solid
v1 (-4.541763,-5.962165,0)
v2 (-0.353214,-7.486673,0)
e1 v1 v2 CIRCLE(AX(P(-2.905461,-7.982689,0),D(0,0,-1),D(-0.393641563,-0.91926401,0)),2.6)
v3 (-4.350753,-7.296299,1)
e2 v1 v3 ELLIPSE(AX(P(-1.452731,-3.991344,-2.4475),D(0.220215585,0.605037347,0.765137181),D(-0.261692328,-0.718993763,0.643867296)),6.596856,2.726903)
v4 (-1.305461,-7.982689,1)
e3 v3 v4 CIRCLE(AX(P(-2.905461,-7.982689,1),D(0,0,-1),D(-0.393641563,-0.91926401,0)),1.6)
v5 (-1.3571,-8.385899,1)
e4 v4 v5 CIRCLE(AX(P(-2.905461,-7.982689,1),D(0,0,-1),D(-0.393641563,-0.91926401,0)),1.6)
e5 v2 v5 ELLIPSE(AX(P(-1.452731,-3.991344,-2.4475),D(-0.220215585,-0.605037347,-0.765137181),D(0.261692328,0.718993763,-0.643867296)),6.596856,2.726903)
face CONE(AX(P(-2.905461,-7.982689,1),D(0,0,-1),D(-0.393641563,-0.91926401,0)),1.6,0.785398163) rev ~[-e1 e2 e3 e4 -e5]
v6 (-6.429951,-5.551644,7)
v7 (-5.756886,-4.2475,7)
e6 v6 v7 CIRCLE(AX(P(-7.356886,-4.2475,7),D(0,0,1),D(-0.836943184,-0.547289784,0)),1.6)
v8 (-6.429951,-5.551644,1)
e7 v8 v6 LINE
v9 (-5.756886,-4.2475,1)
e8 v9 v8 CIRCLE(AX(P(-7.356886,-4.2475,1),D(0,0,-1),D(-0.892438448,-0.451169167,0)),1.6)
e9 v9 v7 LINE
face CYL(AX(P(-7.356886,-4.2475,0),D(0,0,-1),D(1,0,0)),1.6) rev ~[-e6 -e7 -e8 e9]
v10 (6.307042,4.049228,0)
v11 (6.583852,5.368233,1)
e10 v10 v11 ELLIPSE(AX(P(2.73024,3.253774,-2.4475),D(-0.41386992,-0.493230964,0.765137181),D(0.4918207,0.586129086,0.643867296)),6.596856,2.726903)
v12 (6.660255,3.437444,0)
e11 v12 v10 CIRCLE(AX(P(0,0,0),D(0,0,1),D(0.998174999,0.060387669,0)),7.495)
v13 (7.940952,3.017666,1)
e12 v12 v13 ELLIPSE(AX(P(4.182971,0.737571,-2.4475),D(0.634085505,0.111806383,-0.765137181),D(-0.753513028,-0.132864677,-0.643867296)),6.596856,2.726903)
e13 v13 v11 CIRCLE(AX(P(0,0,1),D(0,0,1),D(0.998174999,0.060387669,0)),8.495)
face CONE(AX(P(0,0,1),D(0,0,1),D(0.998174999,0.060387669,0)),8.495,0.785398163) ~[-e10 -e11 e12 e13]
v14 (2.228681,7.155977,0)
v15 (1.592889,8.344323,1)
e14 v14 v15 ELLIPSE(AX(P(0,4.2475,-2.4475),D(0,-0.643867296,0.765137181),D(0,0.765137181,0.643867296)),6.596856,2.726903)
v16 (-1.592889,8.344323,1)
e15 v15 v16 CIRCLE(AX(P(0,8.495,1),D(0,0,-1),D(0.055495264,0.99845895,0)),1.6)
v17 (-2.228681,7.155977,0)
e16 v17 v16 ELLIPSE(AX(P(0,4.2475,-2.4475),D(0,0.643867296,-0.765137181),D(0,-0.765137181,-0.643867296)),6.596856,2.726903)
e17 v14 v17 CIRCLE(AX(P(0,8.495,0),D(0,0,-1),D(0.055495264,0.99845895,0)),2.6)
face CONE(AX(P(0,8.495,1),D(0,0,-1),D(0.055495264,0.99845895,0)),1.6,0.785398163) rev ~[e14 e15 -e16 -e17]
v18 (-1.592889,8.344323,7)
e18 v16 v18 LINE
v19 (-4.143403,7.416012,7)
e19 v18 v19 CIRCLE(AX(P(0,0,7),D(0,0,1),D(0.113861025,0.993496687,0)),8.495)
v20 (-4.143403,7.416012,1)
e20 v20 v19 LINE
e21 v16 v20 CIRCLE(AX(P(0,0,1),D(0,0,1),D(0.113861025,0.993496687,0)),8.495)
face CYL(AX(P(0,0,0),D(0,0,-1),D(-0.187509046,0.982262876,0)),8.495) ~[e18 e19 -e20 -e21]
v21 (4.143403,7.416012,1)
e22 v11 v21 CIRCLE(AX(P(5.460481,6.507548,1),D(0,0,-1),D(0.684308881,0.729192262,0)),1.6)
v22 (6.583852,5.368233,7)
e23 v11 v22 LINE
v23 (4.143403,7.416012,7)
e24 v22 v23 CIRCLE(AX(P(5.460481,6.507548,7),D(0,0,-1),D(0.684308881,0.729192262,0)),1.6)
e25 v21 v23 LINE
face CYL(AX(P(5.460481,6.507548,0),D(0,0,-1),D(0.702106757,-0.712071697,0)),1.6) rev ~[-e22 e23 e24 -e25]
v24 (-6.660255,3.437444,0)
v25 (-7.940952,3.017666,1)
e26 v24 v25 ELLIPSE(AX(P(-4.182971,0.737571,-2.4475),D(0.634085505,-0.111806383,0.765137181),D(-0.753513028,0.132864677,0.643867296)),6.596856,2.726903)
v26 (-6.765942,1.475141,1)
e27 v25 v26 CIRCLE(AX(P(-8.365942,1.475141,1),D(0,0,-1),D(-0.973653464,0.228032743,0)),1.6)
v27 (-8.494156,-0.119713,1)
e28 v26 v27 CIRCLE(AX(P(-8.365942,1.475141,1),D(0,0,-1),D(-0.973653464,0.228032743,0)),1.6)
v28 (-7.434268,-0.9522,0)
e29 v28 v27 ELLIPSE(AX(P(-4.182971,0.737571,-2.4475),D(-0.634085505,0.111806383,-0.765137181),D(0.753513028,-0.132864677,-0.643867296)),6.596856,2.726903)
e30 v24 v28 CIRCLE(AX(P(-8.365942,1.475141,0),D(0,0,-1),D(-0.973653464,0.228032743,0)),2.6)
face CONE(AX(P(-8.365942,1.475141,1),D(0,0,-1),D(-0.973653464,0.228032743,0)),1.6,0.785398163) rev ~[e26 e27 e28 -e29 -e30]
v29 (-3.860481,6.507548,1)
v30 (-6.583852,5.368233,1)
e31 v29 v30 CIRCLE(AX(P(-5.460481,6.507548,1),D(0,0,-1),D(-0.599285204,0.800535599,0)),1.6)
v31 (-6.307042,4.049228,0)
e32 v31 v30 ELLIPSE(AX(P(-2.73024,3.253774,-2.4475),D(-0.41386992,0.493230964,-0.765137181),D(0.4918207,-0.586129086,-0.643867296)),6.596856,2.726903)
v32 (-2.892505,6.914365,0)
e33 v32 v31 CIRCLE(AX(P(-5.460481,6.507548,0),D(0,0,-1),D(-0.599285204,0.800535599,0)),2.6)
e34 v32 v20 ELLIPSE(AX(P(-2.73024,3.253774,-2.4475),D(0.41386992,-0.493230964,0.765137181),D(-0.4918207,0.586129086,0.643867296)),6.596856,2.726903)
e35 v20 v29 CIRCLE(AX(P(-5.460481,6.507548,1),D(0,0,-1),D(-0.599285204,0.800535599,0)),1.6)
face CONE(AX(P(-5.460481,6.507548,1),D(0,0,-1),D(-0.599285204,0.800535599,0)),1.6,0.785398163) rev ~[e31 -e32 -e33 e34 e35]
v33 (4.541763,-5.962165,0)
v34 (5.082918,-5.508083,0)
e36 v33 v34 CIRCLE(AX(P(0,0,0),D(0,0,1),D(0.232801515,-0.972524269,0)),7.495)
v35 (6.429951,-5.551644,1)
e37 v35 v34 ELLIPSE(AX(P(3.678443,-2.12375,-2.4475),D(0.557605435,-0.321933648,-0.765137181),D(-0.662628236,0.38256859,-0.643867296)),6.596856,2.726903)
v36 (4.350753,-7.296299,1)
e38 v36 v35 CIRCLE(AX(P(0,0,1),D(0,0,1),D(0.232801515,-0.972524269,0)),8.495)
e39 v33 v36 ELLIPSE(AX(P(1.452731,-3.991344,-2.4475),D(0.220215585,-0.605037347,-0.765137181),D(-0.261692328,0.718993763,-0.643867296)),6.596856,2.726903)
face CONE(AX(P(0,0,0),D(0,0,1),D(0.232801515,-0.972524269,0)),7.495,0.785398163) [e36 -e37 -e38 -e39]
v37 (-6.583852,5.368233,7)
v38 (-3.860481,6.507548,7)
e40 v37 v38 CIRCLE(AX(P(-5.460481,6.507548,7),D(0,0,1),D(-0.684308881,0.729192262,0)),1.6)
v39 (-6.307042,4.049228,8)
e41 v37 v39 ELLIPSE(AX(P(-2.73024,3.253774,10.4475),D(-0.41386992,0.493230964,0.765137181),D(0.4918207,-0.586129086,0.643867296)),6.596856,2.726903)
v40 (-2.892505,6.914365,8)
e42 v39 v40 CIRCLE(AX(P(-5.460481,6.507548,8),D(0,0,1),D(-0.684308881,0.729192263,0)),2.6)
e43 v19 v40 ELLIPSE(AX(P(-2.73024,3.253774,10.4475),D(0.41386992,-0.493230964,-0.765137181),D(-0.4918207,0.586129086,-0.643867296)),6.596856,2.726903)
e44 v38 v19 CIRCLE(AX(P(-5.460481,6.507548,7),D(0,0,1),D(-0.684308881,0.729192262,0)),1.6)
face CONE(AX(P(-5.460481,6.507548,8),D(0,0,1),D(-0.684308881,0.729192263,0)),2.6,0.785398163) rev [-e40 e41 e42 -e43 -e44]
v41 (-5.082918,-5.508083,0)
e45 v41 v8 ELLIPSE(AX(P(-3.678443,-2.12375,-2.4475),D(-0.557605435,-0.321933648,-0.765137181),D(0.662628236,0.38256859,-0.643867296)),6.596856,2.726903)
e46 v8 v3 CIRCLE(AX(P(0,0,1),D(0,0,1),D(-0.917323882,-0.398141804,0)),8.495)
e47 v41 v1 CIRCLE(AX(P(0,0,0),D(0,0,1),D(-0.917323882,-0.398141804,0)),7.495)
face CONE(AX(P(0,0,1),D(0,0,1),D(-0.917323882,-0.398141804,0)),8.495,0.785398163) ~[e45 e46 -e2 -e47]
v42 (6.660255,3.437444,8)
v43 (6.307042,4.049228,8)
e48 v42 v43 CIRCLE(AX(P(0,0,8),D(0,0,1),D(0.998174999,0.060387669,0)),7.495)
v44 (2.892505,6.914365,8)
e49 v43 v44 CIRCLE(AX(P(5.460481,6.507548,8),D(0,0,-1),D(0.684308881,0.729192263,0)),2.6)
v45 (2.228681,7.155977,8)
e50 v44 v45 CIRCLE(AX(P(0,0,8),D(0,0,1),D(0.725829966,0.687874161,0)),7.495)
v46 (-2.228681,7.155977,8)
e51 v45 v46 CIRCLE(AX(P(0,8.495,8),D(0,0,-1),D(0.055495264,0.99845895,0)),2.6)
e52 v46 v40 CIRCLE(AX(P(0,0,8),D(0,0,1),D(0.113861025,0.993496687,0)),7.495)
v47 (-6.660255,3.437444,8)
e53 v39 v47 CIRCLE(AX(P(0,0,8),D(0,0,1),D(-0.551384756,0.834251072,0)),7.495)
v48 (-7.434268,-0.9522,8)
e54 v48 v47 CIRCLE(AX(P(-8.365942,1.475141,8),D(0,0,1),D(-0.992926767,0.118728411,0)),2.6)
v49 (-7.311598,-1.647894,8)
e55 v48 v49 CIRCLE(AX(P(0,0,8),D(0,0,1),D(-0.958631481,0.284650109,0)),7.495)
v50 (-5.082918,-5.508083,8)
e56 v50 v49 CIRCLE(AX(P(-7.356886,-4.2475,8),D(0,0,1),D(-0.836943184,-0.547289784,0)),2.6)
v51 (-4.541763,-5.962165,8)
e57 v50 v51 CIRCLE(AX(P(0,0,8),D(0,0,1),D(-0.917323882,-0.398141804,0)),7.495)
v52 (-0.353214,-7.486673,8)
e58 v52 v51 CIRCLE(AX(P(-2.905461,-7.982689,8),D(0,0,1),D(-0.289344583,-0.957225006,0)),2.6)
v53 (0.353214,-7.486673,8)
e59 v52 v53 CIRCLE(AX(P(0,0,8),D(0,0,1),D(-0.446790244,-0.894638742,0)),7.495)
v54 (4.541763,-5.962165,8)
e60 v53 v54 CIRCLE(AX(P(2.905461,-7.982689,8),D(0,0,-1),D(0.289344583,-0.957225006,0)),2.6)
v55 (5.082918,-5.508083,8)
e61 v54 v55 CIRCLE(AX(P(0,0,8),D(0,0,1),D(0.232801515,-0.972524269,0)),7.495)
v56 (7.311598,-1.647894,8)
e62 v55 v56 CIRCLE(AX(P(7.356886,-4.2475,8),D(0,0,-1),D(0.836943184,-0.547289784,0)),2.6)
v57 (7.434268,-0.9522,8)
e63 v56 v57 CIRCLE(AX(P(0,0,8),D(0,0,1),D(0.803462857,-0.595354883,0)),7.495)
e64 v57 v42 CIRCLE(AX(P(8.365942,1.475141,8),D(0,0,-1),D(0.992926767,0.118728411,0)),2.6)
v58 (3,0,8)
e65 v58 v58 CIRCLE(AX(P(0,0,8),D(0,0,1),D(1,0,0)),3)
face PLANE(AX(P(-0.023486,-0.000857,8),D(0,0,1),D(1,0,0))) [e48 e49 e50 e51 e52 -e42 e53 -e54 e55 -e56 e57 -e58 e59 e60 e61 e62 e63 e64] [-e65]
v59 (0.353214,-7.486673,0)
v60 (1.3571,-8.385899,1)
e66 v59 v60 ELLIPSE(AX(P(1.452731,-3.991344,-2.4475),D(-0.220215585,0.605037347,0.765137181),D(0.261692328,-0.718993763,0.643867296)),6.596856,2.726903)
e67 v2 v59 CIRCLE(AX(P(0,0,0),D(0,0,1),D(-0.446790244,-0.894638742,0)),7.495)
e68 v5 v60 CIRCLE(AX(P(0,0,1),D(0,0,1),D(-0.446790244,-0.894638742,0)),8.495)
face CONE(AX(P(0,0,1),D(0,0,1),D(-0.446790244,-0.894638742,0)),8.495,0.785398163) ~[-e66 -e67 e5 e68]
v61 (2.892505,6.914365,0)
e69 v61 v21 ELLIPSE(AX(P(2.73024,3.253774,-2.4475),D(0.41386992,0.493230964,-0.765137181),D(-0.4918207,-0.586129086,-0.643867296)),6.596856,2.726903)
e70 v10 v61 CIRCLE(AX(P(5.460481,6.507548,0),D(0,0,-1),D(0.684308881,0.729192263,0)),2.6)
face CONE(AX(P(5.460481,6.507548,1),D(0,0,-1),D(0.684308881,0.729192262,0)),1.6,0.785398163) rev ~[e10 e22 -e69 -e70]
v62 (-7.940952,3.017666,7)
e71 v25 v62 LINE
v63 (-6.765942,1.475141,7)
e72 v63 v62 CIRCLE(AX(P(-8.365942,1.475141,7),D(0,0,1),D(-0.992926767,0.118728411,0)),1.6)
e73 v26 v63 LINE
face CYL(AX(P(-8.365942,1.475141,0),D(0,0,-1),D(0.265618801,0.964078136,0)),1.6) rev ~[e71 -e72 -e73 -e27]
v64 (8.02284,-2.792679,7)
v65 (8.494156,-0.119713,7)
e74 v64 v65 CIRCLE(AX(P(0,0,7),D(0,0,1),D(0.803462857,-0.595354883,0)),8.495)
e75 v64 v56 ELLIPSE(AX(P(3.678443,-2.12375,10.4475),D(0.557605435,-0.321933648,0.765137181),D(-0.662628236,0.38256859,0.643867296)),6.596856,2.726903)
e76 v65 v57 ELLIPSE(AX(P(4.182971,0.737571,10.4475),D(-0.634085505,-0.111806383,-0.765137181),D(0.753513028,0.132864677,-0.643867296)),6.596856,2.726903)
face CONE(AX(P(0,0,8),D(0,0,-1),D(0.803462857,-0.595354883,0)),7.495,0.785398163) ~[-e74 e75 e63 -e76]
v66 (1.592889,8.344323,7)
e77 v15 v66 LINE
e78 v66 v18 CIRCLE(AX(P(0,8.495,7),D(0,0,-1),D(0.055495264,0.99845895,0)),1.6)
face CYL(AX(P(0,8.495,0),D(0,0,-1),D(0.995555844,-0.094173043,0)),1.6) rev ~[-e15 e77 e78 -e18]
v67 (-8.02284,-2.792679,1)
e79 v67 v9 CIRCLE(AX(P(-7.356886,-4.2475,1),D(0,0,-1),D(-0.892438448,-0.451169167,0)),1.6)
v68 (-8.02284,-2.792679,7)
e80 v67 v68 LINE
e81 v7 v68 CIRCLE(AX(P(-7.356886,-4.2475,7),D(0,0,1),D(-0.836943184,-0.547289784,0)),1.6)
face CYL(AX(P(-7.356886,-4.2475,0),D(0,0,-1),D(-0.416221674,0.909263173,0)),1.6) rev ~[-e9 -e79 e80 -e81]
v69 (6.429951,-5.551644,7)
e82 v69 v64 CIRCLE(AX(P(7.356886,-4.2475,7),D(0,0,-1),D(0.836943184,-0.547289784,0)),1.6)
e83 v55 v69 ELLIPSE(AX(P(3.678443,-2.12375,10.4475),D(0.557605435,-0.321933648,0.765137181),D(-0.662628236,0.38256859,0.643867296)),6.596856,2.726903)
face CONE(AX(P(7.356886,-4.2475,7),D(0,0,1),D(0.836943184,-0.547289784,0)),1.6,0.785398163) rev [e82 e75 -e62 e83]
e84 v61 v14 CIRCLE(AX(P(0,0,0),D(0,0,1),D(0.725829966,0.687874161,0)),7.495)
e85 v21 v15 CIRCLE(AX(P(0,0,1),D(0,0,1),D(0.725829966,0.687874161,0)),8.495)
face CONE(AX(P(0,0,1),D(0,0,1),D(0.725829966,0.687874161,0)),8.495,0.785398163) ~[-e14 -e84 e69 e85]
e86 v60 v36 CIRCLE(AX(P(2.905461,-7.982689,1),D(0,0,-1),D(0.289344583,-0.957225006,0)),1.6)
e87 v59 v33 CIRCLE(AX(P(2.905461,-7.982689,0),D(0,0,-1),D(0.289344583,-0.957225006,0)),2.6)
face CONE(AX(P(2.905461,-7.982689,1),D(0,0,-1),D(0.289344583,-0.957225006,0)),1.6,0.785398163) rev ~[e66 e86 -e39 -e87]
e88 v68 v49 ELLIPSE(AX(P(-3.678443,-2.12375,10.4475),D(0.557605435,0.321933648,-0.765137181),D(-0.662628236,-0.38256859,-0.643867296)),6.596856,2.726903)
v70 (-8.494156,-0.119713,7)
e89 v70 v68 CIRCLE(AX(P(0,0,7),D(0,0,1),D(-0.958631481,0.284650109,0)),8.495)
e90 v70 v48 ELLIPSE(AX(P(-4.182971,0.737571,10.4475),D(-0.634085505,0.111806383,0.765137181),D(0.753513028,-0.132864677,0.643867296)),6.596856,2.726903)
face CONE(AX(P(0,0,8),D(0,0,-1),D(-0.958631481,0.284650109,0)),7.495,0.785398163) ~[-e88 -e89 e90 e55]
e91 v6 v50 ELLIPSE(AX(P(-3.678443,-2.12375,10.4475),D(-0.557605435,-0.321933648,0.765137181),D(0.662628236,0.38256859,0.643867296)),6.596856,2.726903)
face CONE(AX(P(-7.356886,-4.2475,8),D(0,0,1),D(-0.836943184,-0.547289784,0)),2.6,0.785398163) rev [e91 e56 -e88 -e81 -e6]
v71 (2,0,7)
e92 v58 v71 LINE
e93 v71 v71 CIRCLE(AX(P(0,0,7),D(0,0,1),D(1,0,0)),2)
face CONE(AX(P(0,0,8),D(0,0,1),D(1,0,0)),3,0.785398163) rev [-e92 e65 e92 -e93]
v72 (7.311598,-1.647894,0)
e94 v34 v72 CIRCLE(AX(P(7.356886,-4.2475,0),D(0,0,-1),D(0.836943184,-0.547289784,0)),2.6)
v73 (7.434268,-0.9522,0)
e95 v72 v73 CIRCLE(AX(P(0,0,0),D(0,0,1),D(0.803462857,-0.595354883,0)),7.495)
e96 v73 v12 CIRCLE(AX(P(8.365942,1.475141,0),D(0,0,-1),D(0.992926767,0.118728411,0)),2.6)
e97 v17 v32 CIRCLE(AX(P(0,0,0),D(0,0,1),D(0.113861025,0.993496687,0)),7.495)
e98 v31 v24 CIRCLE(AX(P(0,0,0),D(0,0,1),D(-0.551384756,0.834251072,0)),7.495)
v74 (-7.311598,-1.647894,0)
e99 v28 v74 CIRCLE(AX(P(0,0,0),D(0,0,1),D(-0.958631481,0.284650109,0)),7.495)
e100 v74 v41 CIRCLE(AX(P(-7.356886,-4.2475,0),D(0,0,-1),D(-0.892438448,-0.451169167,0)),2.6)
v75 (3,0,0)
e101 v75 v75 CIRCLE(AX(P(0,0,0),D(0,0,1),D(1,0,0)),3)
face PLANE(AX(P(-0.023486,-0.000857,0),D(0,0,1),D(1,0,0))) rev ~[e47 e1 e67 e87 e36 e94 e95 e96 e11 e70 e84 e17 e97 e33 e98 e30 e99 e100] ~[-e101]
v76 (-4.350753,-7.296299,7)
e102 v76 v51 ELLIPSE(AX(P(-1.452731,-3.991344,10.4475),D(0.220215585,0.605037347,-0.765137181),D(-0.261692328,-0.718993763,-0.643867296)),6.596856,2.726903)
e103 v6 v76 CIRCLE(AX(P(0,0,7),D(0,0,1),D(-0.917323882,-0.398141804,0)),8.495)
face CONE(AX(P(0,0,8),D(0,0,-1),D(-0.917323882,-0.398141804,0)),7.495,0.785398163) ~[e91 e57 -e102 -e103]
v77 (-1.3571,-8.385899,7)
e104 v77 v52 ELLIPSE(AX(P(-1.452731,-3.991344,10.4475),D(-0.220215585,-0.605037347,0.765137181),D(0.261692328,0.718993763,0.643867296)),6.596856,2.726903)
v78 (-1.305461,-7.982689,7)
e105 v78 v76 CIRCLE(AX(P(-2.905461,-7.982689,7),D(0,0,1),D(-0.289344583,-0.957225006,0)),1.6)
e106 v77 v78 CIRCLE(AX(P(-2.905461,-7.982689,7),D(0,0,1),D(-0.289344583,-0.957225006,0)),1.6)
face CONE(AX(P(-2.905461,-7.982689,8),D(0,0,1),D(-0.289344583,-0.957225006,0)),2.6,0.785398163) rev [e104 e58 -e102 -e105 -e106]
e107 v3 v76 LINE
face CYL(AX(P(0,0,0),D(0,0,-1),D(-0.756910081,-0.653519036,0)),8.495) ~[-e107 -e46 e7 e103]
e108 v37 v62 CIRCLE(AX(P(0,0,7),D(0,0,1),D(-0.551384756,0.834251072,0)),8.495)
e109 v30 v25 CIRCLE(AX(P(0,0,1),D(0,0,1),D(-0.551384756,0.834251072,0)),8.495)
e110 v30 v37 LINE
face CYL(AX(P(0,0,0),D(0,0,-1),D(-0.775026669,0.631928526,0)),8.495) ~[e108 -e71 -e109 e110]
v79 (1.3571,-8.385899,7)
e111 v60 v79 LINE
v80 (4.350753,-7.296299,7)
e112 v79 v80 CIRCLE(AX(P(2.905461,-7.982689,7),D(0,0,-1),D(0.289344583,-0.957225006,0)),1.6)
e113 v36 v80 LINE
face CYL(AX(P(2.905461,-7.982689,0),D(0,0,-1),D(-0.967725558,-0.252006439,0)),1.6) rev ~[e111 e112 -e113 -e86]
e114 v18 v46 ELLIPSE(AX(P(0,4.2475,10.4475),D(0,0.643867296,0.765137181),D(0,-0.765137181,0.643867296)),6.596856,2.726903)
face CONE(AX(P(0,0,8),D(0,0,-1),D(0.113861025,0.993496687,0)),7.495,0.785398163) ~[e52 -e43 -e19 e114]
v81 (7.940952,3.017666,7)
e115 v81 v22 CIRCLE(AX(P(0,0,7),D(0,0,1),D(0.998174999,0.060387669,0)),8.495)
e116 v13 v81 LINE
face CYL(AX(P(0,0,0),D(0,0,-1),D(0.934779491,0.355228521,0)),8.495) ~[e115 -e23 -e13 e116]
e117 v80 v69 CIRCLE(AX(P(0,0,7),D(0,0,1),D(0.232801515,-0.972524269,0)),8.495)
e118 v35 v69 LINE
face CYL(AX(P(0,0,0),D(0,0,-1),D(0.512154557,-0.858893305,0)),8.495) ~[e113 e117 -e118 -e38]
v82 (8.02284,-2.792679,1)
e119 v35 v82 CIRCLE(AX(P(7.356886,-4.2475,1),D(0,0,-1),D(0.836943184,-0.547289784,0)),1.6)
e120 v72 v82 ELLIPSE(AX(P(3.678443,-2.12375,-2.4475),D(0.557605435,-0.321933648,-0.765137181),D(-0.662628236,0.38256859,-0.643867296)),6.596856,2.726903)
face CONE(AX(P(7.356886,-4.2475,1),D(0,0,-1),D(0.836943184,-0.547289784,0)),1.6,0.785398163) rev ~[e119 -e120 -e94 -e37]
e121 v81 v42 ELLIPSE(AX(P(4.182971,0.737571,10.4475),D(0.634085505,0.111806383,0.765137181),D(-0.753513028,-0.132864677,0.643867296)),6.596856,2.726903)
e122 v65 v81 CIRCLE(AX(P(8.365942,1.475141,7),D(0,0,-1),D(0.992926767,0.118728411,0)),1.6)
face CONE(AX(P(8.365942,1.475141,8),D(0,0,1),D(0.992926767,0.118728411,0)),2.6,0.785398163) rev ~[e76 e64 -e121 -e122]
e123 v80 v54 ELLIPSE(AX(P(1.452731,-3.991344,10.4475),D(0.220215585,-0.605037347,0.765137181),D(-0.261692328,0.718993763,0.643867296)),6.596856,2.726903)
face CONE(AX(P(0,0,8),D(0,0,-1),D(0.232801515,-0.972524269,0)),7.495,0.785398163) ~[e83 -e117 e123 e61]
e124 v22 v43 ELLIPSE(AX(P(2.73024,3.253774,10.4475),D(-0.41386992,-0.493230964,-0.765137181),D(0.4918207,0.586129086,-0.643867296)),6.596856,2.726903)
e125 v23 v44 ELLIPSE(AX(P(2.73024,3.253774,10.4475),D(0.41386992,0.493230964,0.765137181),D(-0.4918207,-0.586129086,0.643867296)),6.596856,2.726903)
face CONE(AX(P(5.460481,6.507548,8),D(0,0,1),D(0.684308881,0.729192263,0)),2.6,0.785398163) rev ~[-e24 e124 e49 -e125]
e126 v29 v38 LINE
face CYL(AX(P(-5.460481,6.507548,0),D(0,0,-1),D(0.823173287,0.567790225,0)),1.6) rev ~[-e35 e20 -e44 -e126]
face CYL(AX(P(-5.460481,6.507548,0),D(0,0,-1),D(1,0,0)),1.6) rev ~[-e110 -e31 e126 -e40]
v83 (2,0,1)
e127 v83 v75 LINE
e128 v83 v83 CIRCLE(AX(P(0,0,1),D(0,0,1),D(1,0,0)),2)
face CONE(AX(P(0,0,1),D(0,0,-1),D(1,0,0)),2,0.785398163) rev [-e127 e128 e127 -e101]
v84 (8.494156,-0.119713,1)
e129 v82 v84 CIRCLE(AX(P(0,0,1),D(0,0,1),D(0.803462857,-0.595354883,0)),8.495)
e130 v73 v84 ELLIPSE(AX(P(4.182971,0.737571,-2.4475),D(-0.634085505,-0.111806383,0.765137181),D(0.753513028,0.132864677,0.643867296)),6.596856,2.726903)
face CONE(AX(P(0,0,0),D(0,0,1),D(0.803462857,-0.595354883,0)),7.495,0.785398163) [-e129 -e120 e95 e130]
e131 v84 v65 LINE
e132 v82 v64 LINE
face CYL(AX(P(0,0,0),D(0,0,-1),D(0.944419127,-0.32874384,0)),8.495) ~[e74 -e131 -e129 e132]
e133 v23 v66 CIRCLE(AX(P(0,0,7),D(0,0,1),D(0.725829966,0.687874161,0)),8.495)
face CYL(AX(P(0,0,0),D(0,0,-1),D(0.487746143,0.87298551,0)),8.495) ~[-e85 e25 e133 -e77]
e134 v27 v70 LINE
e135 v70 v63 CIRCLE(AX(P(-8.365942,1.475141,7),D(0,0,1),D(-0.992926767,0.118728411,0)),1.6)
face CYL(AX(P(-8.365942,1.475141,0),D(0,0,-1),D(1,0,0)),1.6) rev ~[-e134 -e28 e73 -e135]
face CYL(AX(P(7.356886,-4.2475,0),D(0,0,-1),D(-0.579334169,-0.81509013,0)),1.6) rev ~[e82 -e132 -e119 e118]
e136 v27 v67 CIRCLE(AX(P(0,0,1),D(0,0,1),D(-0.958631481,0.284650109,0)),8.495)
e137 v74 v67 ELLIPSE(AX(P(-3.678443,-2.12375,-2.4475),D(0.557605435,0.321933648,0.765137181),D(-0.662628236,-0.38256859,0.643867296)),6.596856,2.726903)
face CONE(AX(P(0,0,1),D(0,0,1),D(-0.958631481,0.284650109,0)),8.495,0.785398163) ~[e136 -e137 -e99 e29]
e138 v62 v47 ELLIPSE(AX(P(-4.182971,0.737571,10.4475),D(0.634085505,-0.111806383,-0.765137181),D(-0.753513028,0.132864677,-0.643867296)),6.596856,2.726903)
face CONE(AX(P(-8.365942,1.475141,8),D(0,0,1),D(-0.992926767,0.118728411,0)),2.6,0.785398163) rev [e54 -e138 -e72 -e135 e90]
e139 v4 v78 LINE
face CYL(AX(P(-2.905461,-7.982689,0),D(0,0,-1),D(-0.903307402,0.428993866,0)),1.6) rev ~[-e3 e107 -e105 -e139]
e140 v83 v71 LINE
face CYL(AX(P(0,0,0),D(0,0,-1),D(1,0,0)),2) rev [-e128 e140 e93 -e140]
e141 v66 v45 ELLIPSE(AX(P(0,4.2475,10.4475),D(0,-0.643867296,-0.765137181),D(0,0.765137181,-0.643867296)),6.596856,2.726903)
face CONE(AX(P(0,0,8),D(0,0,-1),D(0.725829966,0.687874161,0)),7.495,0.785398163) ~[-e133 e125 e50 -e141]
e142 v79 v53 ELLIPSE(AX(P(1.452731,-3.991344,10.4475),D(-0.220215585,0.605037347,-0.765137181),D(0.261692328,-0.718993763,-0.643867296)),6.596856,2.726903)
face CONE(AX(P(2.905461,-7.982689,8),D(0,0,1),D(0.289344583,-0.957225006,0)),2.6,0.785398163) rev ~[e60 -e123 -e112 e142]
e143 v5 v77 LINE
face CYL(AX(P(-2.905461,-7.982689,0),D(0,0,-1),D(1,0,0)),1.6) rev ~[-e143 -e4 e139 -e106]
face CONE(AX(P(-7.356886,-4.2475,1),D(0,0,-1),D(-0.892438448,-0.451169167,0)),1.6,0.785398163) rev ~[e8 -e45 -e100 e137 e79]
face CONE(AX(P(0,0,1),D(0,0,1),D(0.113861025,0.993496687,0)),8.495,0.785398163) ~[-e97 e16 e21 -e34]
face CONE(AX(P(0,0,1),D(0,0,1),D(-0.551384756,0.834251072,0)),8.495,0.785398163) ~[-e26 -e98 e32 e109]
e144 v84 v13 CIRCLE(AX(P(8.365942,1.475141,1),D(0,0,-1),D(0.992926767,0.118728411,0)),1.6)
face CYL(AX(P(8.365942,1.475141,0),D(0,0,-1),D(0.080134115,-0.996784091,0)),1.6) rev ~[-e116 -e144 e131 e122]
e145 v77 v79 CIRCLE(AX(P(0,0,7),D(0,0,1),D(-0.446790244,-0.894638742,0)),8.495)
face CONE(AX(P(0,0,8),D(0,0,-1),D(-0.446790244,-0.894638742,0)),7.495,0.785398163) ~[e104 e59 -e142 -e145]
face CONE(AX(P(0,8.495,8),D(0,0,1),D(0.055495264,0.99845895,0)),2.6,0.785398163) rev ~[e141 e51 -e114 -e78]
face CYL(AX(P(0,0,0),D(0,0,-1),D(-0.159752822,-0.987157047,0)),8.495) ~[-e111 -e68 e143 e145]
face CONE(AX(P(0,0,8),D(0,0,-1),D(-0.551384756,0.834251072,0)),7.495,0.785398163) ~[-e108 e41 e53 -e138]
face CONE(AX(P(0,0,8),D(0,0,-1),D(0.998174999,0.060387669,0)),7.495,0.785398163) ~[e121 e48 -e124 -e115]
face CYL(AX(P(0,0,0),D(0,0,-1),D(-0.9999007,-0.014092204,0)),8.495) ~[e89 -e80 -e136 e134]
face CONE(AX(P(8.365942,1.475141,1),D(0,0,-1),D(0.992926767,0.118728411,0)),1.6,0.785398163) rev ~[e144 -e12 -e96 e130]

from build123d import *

# Parameters (mm, degrees)
F0_R         = 2
F1_DEPTH     = 8
F2_T2_ANGLE  = 353.6374425132
F2_T4_ANGLE  = 53.075870109
F2_T6_ANGLE  = 353.6374425132
F2_T8_ANGLE  = 53.075870109
F2_T10_ANGLE = 353.6374425132
F2_T12_ANGLE = 53.075870109
F2_T14_ANGLE = 353.6374425132
F2_T16_ANGLE = 53.075870109
F2_T18_ANGLE = 353.6374425132
F2_T20_ANGLE = 53.075870109
F2_T22_ANGLE = 353.6374425132
F2_T24_ANGLE = 53.075870109
F2_T26_ANGLE = 353.6374425132
F2_T28_ANGLE = 53.075870109
F2_T30_ANGLE = 353.6374425132
F2_T32_ANGLE = 53.075870109
F2_T34_ANGLE = 353.6374425132
F2_T36_ANGLE = 53.075870109
F2_T40_ANGLE = 353.6374425132
F2_T42_ANGLE = 53.075870109
F2_T44_ANGLE = 353.6374425132
F2_T46_ANGLE = 53.075870109
F2_T48_ANGLE = 353.6374425132
F2_T50_ANGLE = 53.075870109
F2_T52_ANGLE = 353.6374425132
F2_T54_ANGLE = 53.075870109
F2_T56_ANGLE = 353.6374425132
F2_T58_ANGLE = 53.075870109
F2_T60_ANGLE = 353.6374425132
F2_T62_ANGLE = 53.075870109
F2_T64_ANGLE = 353.6374425132
F2_T66_ANGLE = 53.075870109
F2_T68_ANGLE = 353.6374425132
F2_T70_ANGLE = 53.075870109
F2_T72_ANGLE = 353.6374425132
F2_T74_ANGLE = 53.075870109


# Not quite as in the source:
# - a fillet or chamfer that OpenCascade refuses, or shapes differently, is made with other operations: its cross-section is extruded or revolved along the edge and cut away or added


with BuildPart() as f1:
    # F0 (on Top) → F1 (new body)
    with BuildSketch(Plane.XY):
        with BuildLine():
            ThreePointArc((8.4941564461, -0.1197132759), (6.790249457, 1.197304185), (7.9409517805, 3.0176662871))
            ThreePointArc((7.9409517805, 3.0176662871), (7.3568858051, 4.2475), (6.583851555, 5.3682328285))
            ThreePointArc((6.583851555, 5.3682328285), (4.4320205688, 5.2818764353), (4.1434034849, 7.416011904))
            ThreePointArc((4.1434034849, 7.416011904), (2.9054611176, 7.9826888136), (1.59288935, 8.3443231313))
            ThreePointArc((1.59288935, 8.3443231313), (0, 6.895), (-1.59288935, 8.3443231313))
            ThreePointArc((-1.59288935, 8.3443231313), (-2.9054611176, 7.9826888136), (-4.1434034849, 7.416011904))
            ThreePointArc((-4.1434034849, 7.416011904), (-3.932847998, 6.983297681), (-3.8604807443, 6.5075475443))
            ThreePointArc((-3.8604807443, 6.5075475443), (-4.8429830913, 5.0315066747), (-6.583851555, 5.3682328285))
            ThreePointArc((-6.583851555, 5.3682328285), (-7.3568858051, 4.2475), (-7.9409517805, 3.0176662871))
            ThreePointArc((-7.9409517805, 3.0176662871), (-7.0931527728, 2.4446813329), (-6.7659418618, 1.4751412693))
            ThreePointArc((-6.7659418618, 1.4751412693), (-7.2808481642, 0.2993131919), (-8.4941564461, -0.1197132759))
            ThreePointArc((-8.4941564461, -0.1197132759), (-8.3659418618, -1.4751412693), (-8.022840484, -2.7926789231))
            ThreePointArc((-8.022840484, -2.7926789231), (-6.4924575219, -2.90111085), (-5.7568858051, -4.2475))
            ThreePointArc((-5.7568858051, -4.2475), (-5.9350743771, -4.9812930656), (-6.4299511341, -5.5516442081))
            ThreePointArc((-6.4299511341, -5.5516442081), (-5.4604807443, -6.5075475443), (-4.3507529612, -7.2962986281))
            ThreePointArc((-4.3507529612, -7.2962986281), (-2.5536564486, -6.4218449793), (-1.3054611176, -7.9826888136))
            ThreePointArc((-1.3054611176, -7.9826888136), (-1.318423401, -8.1859405941), (-1.3571002254, -8.3858991157))
            ThreePointArc((-1.3571002254, -8.3858991157), (0, -8.495), (1.3571002254, -8.3858991157))
            ThreePointArc((1.3571002254, -8.3858991157), (2.3582288882, -6.4791806203), (4.3507529612, -7.2962986281))
            ThreePointArc((4.3507529612, -7.2962986281), (5.4604807443, -6.5075475443), (6.4299511341, -5.5516442081))
            ThreePointArc((6.4299511341, -5.5516442081), (5.9712451591, -3.4475), (8.022840484, -2.7926789231))
            ThreePointArc((8.022840484, -2.7926789231), (8.3659418618, -1.4751412693), (8.4941564461, -0.1197132759))
        make_face()
        Circle(F0_R, mode=Mode.SUBTRACT)
    extrude(amount=F1_DEPTH)

    # F2: chamfer of 1 on 38 edges, made by hand

    # F2_s1 → F2_t2 (revolve, cut)
    with BuildSketch(Plane(origin=(0.2580100634, 0.3945620225, 0), x_dir=(0, 0, 1), z_dir=(0.5472897836, 0.8369431837, 0))):
        Polygon((7, 10.0819087839), (8, 11.0819087839), (8, 10.0819087839), align=None)
    revolve(axis=Axis((7.3568858051, -4.2475, 8), (0, 0, -1)), revolution_arc=F2_T2_ANGLE, mode=Mode.SUBTRACT)

    # F2_s3 → F2_t4 (revolve, cut)
    with BuildSketch(Plane(origin=(0, 0, 0), x_dir=(0, 0, 1), z_dir=(-0.5953548832, -0.8034628573, 0))):
        Polygon((8, -7.495), (7, -8.495), (8, -8.495), align=None)
    revolve(axis=Axis((0, 0, 8), (0, 0, 1)), revolution_arc=F2_T4_ANGLE, mode=Mode.SUBTRACT)

    # F2_s5 → F2_t6 (revolve, cut)
    with BuildSketch(Plane(origin=(-0.055972404, 0.4680977167, 0), x_dir=(0, 0, 1), z_dir=(-0.118728411, 0.9929267669, 0))):
        Polygon((8, 11.0819087839), (7, 10.0819087839), (8, 10.0819087839), align=None)
    revolve(axis=Axis((8.3659418618, 1.4751412693, 8), (0, 0, -1)), revolution_arc=F2_T6_ANGLE, mode=Mode.SUBTRACT)

    # F2_s7 → F2_t8 (revolve, cut)
    with BuildSketch(Plane(origin=(0, 0, 0), x_dir=(0, 0, 1), z_dir=(0.0603876695, -0.9981749994, 0))):
        Polygon((8, -7.495), (7, -8.495), (8, -8.495), align=None)
    revolve(axis=Axis((0, 0, 8), (0, 0, 1)), revolution_arc=F2_T8_ANGLE, mode=Mode.SUBTRACT)

    # F2_s9 → F2_t10 (revolve, cut)
    with BuildSketch(Plane(origin=(-0.3437647615, 0.322605287, 0), x_dir=(0, 0, 1), z_dir=(-0.7291922626, 0.6843088807, 0))):
        Polygon((8, 11.0819087839), (7, 10.0819087839), (8, 10.0819087839), align=None)
    revolve(axis=Axis((5.4604807443, 6.5075475443, 8), (0, 0, -1)), revolution_arc=F2_T10_ANGLE, mode=Mode.SUBTRACT)

    # F2_s11 → F2_t12 (revolve, cut)
    with BuildSketch(Plane(origin=(0, 0, 0), x_dir=(0, 0, 1), z_dir=(0.6878741606, -0.7258299658, 0))):
        Polygon((8, -7.495), (7, -8.495), (8, -8.495), align=None)
    revolve(axis=Axis((0, 0, 8), (0, 0, 1)), revolution_arc=F2_T12_ANGLE, mode=Mode.SUBTRACT)

    # F2_s13 → F2_t14 (revolve, cut)
    with BuildSketch(Plane(origin=(-0.4707057666, 0.0261622581, 0), x_dir=(0, 0, 1), z_dir=(-0.9984589504, 0.0554952639, 0))):
        Polygon((8, 11.0819087839), (7, 10.0819087839), (8, 10.0819087839), align=None)
    revolve(axis=Axis((0, 8.495, 8), (0, 0, -1)), revolution_arc=F2_T14_ANGLE, mode=Mode.SUBTRACT)

    # F2_s15 → F2_t16 (revolve, cut)
    with BuildSketch(Plane(origin=(0, 0, 0), x_dir=(0, 0, 1), z_dir=(0.993496687, -0.1138610245, 0))):
        Polygon((8, -7.495), (7, -8.495), (8, -8.495), align=None)
    revolve(axis=Axis((0, 0, 8), (0, 0, 1)), revolution_arc=F2_T16_ANGLE, mode=Mode.SUBTRACT)

    # F2_s17 → F2_t18 (revolve, cut)
    with BuildSketch(Plane(origin=(0.3437647615, 0.322605287, 0), x_dir=(0, 0, 1), z_dir=(0.7291922626, 0.6843088807, 0))):
        Polygon((8, -11.0819087839), (7, -10.0819087839), (8, -10.0819087839), align=None)
    revolve(axis=Axis((-5.4604807443, 6.5075475443, 8), (0, 0, 1)), revolution_arc=F2_T18_ANGLE, mode=Mode.SUBTRACT)

    # F2_s19 → F2_t20 (revolve, cut)
    with BuildSketch(Plane(origin=(0, 0, 0), x_dir=(0, 0, 1), z_dir=(0.8342510721, 0.5513847556, 0))):
        Polygon((8, -7.495), (7, -8.495), (8, -8.495), align=None)
    revolve(axis=Axis((0, 0, 8), (0, 0, 1)), revolution_arc=F2_T20_ANGLE, mode=Mode.SUBTRACT)

    # F2_s21 → F2_t22 (revolve, cut)
    with BuildSketch(Plane(origin=(0.055972404, 0.4680977167, 0), x_dir=(0, 0, 1), z_dir=(0.118728411, 0.9929267669, 0))):
        Polygon((8, -11.0819087839), (7, -10.0819087839), (8, -10.0819087839), align=None)
    revolve(axis=Axis((-8.3659418618, 1.4751412693, 8), (0, 0, 1)), revolution_arc=F2_T22_ANGLE, mode=Mode.SUBTRACT)

    # F2_s23 → F2_t24 (revolve, cut)
    with BuildSketch(Plane(origin=(0, 0, 0), x_dir=(0, 0, 1), z_dir=(0.2846501089, 0.9586314806, 0))):
        Polygon((8, -7.495), (7, -8.495), (8, -8.495), align=None)
    revolve(axis=Axis((0, 0, 8), (0, 0, 1)), revolution_arc=F2_T24_ANGLE, mode=Mode.SUBTRACT)

    # F2_s25 → F2_t26 (revolve, cut)
    with BuildSketch(Plane(origin=(-0.2580100634, 0.3945620225, 0), x_dir=(0, 0, 1), z_dir=(-0.5472897836, 0.8369431837, 0))):
        Polygon((8, -11.0819087839), (7, -10.0819087839), (8, -10.0819087839), align=None)
    revolve(axis=Axis((-7.3568858051, -4.2475, 8), (0, 0, 1)), revolution_arc=F2_T26_ANGLE, mode=Mode.SUBTRACT)

    # F2_s27 → F2_t28 (revolve, cut)
    with BuildSketch(Plane(origin=(0, 0, 0), x_dir=(0, 0, 1), z_dir=(-0.3981418038, 0.9173238818, 0))):
        Polygon((8, -7.495), (7, -8.495), (8, -8.495), align=None)
    revolve(axis=Axis((0, 0, 8), (0, 0, 1)), revolution_arc=F2_T28_ANGLE, mode=Mode.SUBTRACT)

    # F2_s29 → F2_t30 (revolve, cut)
    with BuildSketch(Plane(origin=(-0.4512667547, 0.1364063729, 0), x_dir=(0, 0, 1), z_dir=(-0.957225006, 0.2893445833, 0))):
        Polygon((8, -11.0819087839), (7, -10.0819087839), (8, -10.0819087839), align=None)
    revolve(axis=Axis((-2.9054611176, -7.9826888136, 8), (0, 0, 1)), revolution_arc=F2_T30_ANGLE, mode=Mode.SUBTRACT)

    # F2_s31 → F2_t32 (revolve, cut)
    with BuildSketch(Plane(origin=(0, 0, 0), x_dir=(0, 0, 1), z_dir=(-0.8946387416, 0.4467902438, 0))):
        Polygon((8, -7.495), (7, -8.495), (8, -8.495), align=None)
    revolve(axis=Axis((0, 0, 8), (0, 0, 1)), revolution_arc=F2_T32_ANGLE, mode=Mode.SUBTRACT)

    # F2_s33 → F2_t34 (revolve, cut)
    with BuildSketch(Plane(origin=(0.4512667547, 0.1364063729, 0), x_dir=(0, 0, 1), z_dir=(0.957225006, 0.2893445833, 0))):
        Polygon((8, 11.0819087839), (7, 10.0819087839), (8, 10.0819087839), align=None)
    revolve(axis=Axis((2.9054611176, -7.9826888136, 8), (0, 0, -1)), revolution_arc=F2_T34_ANGLE, mode=Mode.SUBTRACT)

    # F2_s35 → F2_t36 (revolve, cut)
    with BuildSketch(Plane(origin=(0, 0, 0), x_dir=(0, 0, 1), z_dir=(-0.9725242695, -0.2328015148, 0))):
        Polygon((8, -7.495), (7, -8.495), (8, -8.495), align=None)
    revolve(axis=Axis((0, 0, 8), (0, 0, 1)), revolution_arc=F2_T36_ANGLE, mode=Mode.SUBTRACT)

    # F2_s37 → F2_t38 (revolve, cut)
    with BuildSketch(Plane.XZ):
        Polygon((3, 8), (2, 7), (2, 8), align=None)
    revolve(axis=Axis((0, 0, 8), (0, 0, 1)), mode=Mode.SUBTRACT)

    # F2_s39 → F2_t40 (revolve, cut)
    with BuildSketch(Plane(origin=(0.2580100634, 0.3945620225, 0), x_dir=(0, 0, 1), z_dir=(0.5472897836, 0.8369431837, 0))):
        Polygon((1, 10.0819087839), (0, 11.0819087839), (0, 10.0819087839), align=None)
    revolve(axis=Axis((7.3568858051, -4.2475, 0), (0, 0, -1)), revolution_arc=F2_T40_ANGLE, mode=Mode.SUBTRACT)

    # F2_s41 → F2_t42 (revolve, cut)
    with BuildSketch(Plane(origin=(0, 0, 0), x_dir=(0, 0, 1), z_dir=(-0.5953548832, -0.8034628573, 0))):
        Polygon((0, -7.495), (1, -8.495), (0, -8.495), align=None)
    revolve(axis=Axis((0, 0, 0), (0, 0, 1)), revolution_arc=F2_T42_ANGLE, mode=Mode.SUBTRACT)

    # F2_s43 → F2_t44 (revolve, cut)
    with BuildSketch(Plane(origin=(-0.055972404, 0.4680977167, 0), x_dir=(0, 0, 1), z_dir=(-0.118728411, 0.9929267669, 0))):
        Polygon((1, 10.0819087839), (0, 11.0819087839), (0, 10.0819087839), align=None)
    revolve(axis=Axis((8.3659418618, 1.4751412693, 0), (0, 0, -1)), revolution_arc=F2_T44_ANGLE, mode=Mode.SUBTRACT)

    # F2_s45 → F2_t46 (revolve, cut)
    with BuildSketch(Plane(origin=(0, 0, 0), x_dir=(0, 0, 1), z_dir=(0.0603876695, -0.9981749994, 0))):
        Polygon((1, -8.495), (0, -7.495), (0, -8.495), align=None)
    revolve(axis=Axis((0, 0, 0), (0, 0, 1)), revolution_arc=F2_T46_ANGLE, mode=Mode.SUBTRACT)

    # F2_s47 → F2_t48 (revolve, cut)
    with BuildSketch(Plane(origin=(-0.3437647615, 0.322605287, 0), x_dir=(0, 0, 1), z_dir=(-0.7291922626, 0.6843088807, 0))):
        Polygon((1, 10.0819087839), (0, 11.0819087839), (0, 10.0819087839), align=None)
    revolve(axis=Axis((5.4604807443, 6.5075475443, 0), (0, 0, -1)), revolution_arc=F2_T48_ANGLE, mode=Mode.SUBTRACT)

    # F2_s49 → F2_t50 (revolve, cut)
    with BuildSketch(Plane(origin=(0, 0, 0), x_dir=(0, 0, 1), z_dir=(0.6878741606, -0.7258299658, 0))):
        Polygon((1, -8.495), (0, -7.495), (0, -8.495), align=None)
    revolve(axis=Axis((0, 0, 0), (0, 0, 1)), revolution_arc=F2_T50_ANGLE, mode=Mode.SUBTRACT)

    # F2_s51 → F2_t52 (revolve, cut)
    with BuildSketch(Plane(origin=(-0.4707057666, 0.0261622581, 0), x_dir=(0, 0, 1), z_dir=(-0.9984589504, 0.0554952639, 0))):
        Polygon((1, 10.0819087839), (0, 11.0819087839), (0, 10.0819087839), align=None)
    revolve(axis=Axis((0, 8.495, 0), (0, 0, -1)), revolution_arc=F2_T52_ANGLE, mode=Mode.SUBTRACT)

    # F2_s53 → F2_t54 (revolve, cut)
    with BuildSketch(Plane(origin=(0, 0, 0), x_dir=(0, 0, 1), z_dir=(0.993496687, -0.1138610245, 0))):
        Polygon((1, -8.495), (0, -7.495), (0, -8.495), align=None)
    revolve(axis=Axis((0, 0, 0), (0, 0, 1)), revolution_arc=F2_T54_ANGLE, mode=Mode.SUBTRACT)

    # F2_s55 → F2_t56 (revolve, cut)
    with BuildSketch(Plane(origin=(-0.3773983122, -0.2825223821, 0), x_dir=(0, 0, 1), z_dir=(-0.8005355987, -0.5992852036, 0))):
        Polygon((1, 10.0819087839), (0, 11.0819087839), (0, 10.0819087839), align=None)
    revolve(axis=Axis((-5.4604807443, 6.5075475443, 0), (0, 0, -1)), revolution_arc=F2_T56_ANGLE, mode=Mode.SUBTRACT)

    # F2_s57 → F2_t58 (revolve, cut)
    with BuildSketch(Plane(origin=(0, 0, 0), x_dir=(0, 0, 1), z_dir=(0.8342510721, 0.5513847556, 0))):
        Polygon((1, -8.495), (0, -7.495), (0, -8.495), align=None)
    revolve(axis=Axis((0, 0, 0), (0, 0, 1)), revolution_arc=F2_T58_ANGLE, mode=Mode.SUBTRACT)

    # F2_s59 → F2_t60 (revolve, cut)
    with BuildSketch(Plane(origin=(-0.1075019932, -0.4590116599, 0), x_dir=(0, 0, 1), z_dir=(-0.2280327434, -0.973653464, 0))):
        Polygon((1, 10.0819087839), (0, 11.0819087839), (0, 10.0819087839), align=None)
    revolve(axis=Axis((-8.3659418618, 1.4751412693, 0), (0, 0, -1)), revolution_arc=F2_T60_ANGLE, mode=Mode.SUBTRACT)

    # F2_s61 → F2_t62 (revolve, cut)
    with BuildSketch(Plane(origin=(0, 0, 0), x_dir=(0, 0, 1), z_dir=(0.2846501089, 0.9586314806, 0))):
        Polygon((1, -8.495), (0, -7.495), (0, -8.495), align=None)
    revolve(axis=Axis((0, 0, 0), (0, 0, 1)), revolution_arc=F2_T62_ANGLE, mode=Mode.SUBTRACT)

    # F2_s63 → F2_t64 (revolve, cut)
    with BuildSketch(Plane(origin=(0.2126957032, -0.4207242806, 0), x_dir=(0, 0, 1), z_dir=(0.4511691669, -0.8924384477, 0))):
        Polygon((1, 10.0819087839), (0, 11.0819087839), (0, 10.0819087839), align=None)
    revolve(axis=Axis((-7.3568858051, -4.2475, 0), (0, 0, -1)), revolution_arc=F2_T64_ANGLE, mode=Mode.SUBTRACT)

    # F2_s65 → F2_t66 (revolve, cut)
    with BuildSketch(Plane(origin=(0, 0, 0), x_dir=(0, 0, 1), z_dir=(-0.3981418038, 0.9173238818, 0))):
        Polygon((1, -8.495), (0, -7.495), (0, -8.495), align=None)
    revolve(axis=Axis((0, 0, 0), (0, 0, 1)), revolution_arc=F2_T66_ANGLE, mode=Mode.SUBTRACT)

    # F2_s67 → F2_t68 (revolve, cut)
    with BuildSketch(Plane(origin=(0.4333707161, -0.1855753346, 0), x_dir=(0, 0, 1), z_dir=(0.9192640097, -0.3936415633, 0))):
        Polygon((1, 10.0819087839), (0, 11.0819087839), (0, 10.0819087839), align=None)
    revolve(axis=Axis((-2.9054611176, -7.9826888136, 0), (0, 0, -1)), revolution_arc=F2_T68_ANGLE, mode=Mode.SUBTRACT)

    # F2_s69 → F2_t70 (revolve, cut)
    with BuildSketch(Plane(origin=(0, 0, 0), x_dir=(0, 0, 1), z_dir=(-0.8946387416, 0.4467902438, 0))):
        Polygon((1, -8.495), (0, -7.495), (0, -8.495), align=None)
    revolve(axis=Axis((0, 0, 0), (0, 0, 1)), revolution_arc=F2_T70_ANGLE, mode=Mode.SUBTRACT)

    # F2_s71 → F2_t72 (revolve, cut)
    with BuildSketch(Plane(origin=(0.4512667547, 0.1364063729, 0), x_dir=(0, 0, 1), z_dir=(0.957225006, 0.2893445833, 0))):
        Polygon((1, 10.0819087839), (0, 11.0819087839), (0, 10.0819087839), align=None)
    revolve(axis=Axis((2.9054611176, -7.9826888136, 0), (0, 0, -1)), revolution_arc=F2_T72_ANGLE, mode=Mode.SUBTRACT)

    # F2_s73 → F2_t74 (revolve, cut)
    with BuildSketch(Plane(origin=(0, 0, 0), x_dir=(0, 0, 1), z_dir=(-0.9725242695, -0.2328015148, 0))):
        Polygon((0, -7.495), (1, -8.495), (0, -8.495), align=None)
    revolve(axis=Axis((0, 0, 0), (0, 0, 1)), revolution_arc=F2_T74_ANGLE, mode=Mode.SUBTRACT)

    # F2_s75 → F2_t76 (revolve, cut)
    with BuildSketch(Plane.XZ):
        Polygon((2, 1), (3, 0), (2, 0), align=None)
    revolve(axis=Axis((0, 0, 0), (0, 0, 1)), mode=Mode.SUBTRACT)


solid = f1.part
